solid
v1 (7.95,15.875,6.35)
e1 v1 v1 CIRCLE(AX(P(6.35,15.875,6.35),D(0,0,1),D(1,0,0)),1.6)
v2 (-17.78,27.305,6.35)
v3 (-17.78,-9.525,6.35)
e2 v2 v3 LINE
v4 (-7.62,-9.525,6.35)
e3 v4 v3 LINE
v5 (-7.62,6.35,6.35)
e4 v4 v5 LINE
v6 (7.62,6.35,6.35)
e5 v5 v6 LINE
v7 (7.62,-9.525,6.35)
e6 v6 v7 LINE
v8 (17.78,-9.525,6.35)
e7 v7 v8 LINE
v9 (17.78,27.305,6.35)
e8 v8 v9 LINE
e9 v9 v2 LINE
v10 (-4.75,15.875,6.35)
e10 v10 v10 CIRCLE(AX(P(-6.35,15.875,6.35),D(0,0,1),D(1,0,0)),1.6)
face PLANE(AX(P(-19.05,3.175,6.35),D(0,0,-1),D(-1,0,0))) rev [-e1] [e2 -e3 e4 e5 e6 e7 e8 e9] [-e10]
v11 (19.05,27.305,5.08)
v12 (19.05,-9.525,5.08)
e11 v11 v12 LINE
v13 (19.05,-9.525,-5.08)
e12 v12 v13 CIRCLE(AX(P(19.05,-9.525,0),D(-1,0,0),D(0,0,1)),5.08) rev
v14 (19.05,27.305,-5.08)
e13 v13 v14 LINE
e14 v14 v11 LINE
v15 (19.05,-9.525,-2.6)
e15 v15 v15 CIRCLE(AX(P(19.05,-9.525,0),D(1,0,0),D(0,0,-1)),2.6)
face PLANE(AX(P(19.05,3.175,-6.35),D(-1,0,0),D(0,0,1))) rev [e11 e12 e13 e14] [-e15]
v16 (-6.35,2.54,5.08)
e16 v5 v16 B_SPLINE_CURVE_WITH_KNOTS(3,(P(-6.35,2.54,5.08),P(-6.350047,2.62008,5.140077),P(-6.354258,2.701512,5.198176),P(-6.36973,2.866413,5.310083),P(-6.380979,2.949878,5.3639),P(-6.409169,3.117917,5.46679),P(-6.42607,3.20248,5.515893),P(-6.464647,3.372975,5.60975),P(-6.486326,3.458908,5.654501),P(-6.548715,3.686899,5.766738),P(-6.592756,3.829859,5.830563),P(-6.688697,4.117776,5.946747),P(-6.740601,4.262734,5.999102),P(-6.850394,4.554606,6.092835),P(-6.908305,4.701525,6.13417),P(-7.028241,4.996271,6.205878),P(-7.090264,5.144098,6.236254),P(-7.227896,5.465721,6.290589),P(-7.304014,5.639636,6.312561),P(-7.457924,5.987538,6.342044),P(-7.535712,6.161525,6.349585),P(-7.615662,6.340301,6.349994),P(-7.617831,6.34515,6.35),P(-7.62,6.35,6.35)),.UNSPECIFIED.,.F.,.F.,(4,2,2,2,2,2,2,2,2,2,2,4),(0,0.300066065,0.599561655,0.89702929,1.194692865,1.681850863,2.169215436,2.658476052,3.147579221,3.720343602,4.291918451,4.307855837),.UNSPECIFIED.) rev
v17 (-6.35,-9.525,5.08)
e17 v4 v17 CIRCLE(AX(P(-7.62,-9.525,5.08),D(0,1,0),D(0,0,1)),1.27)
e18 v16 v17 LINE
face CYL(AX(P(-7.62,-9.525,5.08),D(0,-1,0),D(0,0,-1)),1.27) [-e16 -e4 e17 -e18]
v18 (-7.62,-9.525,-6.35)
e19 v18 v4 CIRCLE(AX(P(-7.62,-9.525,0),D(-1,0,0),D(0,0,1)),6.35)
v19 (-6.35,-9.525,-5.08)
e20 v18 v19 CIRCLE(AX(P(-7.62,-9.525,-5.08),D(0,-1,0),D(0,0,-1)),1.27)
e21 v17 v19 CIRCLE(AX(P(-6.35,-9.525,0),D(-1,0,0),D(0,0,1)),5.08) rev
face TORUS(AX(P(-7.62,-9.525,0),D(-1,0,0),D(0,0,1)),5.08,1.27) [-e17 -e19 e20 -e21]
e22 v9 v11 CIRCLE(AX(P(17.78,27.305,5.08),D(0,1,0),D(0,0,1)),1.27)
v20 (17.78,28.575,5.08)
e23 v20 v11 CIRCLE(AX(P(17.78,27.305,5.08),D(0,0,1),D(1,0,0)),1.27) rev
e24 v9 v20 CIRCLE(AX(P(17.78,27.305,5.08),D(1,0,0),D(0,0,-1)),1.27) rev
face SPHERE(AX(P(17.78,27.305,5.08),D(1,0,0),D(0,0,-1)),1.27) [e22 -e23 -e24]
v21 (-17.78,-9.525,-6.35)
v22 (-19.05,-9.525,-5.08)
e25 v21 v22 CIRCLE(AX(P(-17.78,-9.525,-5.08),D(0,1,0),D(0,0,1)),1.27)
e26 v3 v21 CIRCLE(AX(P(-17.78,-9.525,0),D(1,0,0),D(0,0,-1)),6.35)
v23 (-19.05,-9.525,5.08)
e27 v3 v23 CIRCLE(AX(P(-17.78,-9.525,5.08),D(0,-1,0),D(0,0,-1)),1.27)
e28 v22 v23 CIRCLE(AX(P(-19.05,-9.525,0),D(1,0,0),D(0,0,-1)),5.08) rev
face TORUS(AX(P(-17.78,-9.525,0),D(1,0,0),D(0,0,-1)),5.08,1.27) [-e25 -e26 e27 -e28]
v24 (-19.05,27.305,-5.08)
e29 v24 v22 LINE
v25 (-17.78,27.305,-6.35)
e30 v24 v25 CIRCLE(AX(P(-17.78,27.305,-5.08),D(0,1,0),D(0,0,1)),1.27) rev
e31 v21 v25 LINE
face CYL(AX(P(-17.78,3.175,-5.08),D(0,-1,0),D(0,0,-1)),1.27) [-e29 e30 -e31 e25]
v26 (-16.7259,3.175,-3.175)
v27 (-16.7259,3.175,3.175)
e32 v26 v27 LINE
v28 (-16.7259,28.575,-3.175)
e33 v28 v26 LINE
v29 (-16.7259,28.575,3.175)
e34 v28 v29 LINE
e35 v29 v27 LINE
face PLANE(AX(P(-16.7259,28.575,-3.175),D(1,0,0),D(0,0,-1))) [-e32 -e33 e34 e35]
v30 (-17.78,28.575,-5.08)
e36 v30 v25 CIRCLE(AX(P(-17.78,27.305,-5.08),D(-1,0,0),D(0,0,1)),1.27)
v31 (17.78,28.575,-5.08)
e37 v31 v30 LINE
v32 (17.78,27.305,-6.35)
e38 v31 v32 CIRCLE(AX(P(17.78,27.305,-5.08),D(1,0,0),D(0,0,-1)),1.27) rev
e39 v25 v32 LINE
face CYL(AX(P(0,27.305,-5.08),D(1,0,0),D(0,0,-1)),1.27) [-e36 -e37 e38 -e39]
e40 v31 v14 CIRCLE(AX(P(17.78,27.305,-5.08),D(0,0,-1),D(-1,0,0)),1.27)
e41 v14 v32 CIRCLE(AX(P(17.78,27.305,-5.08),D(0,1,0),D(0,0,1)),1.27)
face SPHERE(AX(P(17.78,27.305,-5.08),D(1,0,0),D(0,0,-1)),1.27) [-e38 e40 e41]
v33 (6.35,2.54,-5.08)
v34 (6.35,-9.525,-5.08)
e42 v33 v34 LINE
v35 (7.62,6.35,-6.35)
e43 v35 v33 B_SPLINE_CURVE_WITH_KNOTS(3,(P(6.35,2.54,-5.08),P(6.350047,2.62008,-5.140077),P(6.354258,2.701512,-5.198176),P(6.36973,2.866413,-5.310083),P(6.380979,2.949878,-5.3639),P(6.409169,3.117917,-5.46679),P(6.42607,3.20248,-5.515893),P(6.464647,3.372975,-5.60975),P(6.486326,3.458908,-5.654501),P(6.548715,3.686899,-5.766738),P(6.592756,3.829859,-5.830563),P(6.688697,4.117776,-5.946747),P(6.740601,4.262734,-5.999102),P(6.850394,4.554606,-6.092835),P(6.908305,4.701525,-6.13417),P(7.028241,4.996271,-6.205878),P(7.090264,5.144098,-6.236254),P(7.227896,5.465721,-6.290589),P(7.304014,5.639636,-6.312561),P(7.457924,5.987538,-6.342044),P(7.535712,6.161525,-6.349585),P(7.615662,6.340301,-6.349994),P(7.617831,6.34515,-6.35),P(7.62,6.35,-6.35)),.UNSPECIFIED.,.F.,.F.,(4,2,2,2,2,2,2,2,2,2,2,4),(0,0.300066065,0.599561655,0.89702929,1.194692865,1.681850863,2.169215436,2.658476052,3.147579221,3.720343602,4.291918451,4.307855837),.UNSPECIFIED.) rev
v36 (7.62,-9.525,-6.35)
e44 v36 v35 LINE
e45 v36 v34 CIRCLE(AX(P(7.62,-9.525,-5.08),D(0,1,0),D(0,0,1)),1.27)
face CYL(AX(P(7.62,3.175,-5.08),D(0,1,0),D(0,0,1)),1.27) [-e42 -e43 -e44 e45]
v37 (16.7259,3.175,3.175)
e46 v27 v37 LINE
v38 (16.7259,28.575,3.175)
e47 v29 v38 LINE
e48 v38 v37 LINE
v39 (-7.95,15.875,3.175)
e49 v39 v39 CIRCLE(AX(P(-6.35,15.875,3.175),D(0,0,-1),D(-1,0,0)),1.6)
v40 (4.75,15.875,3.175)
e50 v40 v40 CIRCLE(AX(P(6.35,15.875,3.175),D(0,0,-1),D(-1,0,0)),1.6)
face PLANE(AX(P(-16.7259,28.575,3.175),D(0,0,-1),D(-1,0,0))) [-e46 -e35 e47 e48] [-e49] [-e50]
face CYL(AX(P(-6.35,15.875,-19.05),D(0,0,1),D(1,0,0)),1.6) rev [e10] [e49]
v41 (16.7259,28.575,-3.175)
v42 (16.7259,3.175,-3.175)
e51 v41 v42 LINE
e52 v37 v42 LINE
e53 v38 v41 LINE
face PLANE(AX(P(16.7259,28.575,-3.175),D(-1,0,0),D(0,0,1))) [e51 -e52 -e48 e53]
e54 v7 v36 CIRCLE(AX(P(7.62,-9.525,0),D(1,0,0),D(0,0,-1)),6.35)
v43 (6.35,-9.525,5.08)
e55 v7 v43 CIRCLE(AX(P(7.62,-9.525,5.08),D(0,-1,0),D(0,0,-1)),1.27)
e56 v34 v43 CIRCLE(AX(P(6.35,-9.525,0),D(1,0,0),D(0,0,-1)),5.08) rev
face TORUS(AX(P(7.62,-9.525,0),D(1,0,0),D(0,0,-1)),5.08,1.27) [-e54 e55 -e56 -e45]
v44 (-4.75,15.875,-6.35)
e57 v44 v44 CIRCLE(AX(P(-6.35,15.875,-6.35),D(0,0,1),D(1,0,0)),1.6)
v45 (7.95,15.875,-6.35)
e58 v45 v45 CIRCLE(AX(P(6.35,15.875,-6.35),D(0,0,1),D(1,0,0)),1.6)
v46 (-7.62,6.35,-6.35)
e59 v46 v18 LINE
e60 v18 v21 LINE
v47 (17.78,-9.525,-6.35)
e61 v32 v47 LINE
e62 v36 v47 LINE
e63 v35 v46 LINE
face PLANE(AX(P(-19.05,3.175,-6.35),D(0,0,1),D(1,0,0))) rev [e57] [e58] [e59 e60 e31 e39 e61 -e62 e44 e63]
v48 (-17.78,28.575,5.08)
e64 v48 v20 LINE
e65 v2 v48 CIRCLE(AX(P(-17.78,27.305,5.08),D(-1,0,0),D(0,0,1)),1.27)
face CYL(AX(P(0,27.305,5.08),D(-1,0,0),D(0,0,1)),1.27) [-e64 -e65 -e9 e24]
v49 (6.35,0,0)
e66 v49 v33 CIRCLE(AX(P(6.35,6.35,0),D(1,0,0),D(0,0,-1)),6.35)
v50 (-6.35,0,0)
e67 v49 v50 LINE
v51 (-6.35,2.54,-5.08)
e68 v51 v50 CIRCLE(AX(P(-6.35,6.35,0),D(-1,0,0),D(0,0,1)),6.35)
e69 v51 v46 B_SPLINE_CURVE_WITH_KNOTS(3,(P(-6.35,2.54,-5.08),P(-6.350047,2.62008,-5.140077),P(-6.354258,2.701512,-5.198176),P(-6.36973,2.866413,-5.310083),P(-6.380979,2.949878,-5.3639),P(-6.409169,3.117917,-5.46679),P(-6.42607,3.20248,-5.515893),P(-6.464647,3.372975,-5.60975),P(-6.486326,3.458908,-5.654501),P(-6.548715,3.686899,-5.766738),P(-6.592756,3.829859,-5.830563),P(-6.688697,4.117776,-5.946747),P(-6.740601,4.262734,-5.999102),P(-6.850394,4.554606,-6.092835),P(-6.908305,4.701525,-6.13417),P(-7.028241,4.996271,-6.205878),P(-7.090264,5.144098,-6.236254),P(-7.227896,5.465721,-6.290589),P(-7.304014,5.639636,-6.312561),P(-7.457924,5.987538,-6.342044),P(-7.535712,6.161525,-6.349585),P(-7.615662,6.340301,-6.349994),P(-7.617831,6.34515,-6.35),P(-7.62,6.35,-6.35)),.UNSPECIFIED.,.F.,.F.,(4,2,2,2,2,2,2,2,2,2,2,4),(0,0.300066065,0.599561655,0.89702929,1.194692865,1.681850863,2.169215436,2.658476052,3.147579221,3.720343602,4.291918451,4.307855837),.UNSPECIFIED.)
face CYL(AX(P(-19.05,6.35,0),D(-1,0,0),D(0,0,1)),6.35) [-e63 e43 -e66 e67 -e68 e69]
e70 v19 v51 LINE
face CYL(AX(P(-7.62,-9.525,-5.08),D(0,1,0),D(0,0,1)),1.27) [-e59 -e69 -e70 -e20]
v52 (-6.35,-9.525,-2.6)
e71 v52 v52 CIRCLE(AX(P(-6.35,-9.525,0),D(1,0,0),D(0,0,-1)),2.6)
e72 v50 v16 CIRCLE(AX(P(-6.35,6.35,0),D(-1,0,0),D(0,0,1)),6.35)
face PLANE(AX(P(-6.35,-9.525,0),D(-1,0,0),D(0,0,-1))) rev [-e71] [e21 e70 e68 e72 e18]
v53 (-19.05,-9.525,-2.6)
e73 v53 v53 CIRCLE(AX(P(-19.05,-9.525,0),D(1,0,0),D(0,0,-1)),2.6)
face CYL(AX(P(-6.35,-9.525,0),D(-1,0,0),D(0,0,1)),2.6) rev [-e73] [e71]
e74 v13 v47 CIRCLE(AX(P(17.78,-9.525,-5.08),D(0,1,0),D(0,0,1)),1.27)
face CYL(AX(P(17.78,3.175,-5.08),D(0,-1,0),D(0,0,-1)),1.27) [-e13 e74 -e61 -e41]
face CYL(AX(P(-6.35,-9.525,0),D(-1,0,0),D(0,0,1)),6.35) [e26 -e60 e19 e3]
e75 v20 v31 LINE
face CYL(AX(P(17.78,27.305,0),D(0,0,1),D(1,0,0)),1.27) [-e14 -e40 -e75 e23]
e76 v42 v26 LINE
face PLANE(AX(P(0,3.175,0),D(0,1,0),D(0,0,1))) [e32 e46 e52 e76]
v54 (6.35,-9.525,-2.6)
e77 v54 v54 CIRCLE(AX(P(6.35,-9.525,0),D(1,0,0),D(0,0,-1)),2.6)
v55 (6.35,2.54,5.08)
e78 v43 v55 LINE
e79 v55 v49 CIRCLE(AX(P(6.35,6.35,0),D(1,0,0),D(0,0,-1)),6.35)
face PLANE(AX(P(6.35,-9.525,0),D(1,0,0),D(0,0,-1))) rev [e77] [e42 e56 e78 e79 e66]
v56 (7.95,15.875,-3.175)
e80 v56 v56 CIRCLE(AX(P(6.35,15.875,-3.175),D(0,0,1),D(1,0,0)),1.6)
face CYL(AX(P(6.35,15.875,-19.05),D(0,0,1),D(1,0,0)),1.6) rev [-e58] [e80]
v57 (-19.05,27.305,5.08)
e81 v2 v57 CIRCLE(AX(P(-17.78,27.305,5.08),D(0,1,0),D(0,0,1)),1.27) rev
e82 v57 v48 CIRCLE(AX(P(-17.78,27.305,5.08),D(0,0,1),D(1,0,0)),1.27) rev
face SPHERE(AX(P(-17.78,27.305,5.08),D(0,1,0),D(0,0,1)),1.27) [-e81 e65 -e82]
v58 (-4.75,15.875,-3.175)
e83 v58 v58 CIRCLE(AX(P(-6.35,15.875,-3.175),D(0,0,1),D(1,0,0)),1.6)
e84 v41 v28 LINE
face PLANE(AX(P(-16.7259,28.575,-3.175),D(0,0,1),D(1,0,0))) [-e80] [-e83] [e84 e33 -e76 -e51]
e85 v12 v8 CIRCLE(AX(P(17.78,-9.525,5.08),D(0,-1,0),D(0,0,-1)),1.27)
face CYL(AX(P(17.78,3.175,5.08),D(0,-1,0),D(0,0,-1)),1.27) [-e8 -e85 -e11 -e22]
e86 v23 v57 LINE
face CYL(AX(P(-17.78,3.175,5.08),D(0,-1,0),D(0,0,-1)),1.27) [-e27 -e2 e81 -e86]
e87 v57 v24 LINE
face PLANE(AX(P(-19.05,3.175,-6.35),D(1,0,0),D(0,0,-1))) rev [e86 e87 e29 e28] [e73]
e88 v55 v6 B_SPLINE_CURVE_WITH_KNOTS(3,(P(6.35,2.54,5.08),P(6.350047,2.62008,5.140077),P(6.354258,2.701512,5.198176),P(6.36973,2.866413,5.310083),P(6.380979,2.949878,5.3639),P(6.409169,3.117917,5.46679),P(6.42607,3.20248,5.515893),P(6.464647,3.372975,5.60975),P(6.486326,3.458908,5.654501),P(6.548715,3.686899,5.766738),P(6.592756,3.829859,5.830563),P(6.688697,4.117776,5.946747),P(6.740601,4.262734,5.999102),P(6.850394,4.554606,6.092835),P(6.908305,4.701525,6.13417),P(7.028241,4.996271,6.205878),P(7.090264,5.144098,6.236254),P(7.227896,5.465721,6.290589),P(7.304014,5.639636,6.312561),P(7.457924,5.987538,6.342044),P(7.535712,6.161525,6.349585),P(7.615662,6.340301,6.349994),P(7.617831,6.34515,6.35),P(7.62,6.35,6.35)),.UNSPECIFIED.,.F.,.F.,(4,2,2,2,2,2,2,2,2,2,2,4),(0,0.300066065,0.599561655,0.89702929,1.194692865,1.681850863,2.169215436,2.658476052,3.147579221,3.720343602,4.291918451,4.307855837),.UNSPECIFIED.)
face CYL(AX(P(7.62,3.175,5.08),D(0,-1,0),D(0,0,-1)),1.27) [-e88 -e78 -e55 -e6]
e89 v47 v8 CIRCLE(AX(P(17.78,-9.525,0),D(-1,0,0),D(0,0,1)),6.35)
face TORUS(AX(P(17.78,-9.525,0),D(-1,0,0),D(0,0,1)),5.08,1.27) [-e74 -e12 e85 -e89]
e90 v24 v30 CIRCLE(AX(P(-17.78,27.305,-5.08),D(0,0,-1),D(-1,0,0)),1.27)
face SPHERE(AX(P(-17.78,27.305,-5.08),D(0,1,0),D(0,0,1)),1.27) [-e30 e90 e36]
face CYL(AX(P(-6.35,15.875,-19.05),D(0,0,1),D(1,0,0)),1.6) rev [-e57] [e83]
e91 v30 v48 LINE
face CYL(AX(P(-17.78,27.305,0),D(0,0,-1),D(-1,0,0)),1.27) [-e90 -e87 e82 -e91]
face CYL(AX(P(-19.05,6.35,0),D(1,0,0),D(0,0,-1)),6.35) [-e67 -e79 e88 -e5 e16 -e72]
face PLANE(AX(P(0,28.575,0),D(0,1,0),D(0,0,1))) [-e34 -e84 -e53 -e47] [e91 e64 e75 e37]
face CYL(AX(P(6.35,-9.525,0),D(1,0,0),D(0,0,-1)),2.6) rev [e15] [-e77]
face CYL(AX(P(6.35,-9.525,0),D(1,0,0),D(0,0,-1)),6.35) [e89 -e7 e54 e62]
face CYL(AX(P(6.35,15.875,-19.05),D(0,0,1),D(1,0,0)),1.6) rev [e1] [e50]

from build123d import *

# Parameters (mm, degrees)
ESQUISSE1_W             = 38.1
ESQUISSE1_H             = 12.7
BOSS_EXTRU_1_DEPTH      = 3.175
ESQUISSE2_W             = 38.1
ESQUISSE2_H             = 12.7
ESQUISSE2_W_2           = 33.4518
ESQUISSE2_H_2           = 6.35
BOSS_EXTRU_2_DEPTH      = 25.4
ESQUISSE3_R             = 1.6
ENL_V_MAT_EXTRU_1_DEPTH = 25.4
ESQUISSE4_R             = 2.6
BOSS_EXTRU_3_DEPTH      = 12.7
CONG_1_R                = 6.35
CONG_2_R                = 1.27


with BuildPart() as part:
    # Esquisse1 → Boss.-Extru.1 (new body)
    with BuildSketch(Plane(origin=(0, 0, 0), x_dir=(1, 0, 0), z_dir=(0, 1, 0))):
        Rectangle(ESQUISSE1_W, ESQUISSE1_H)
    extrude(amount=BOSS_EXTRU_1_DEPTH)

    # Esquisse2 → Boss.-Extru.2 (add)
    with BuildSketch(Plane(origin=(0, 3.175, 0), x_dir=(1, 0, 0), z_dir=(0, 1, 0))):
        Rectangle(ESQUISSE2_W, ESQUISSE2_H)
        Rectangle(ESQUISSE2_W_2, ESQUISSE2_H_2, mode=Mode.SUBTRACT)
    extrude(amount=BOSS_EXTRU_2_DEPTH)

    # Esquisse3 → Enlèv. mat.-Extru.1 (cut)
    with BuildSketch(Plane.XY.offset(6.35)):
        with Locations((-6.35, 15.875)):
            Circle(ESQUISSE3_R)
        with Locations((6.35, 15.875)):
            Circle(ESQUISSE3_R)
    extrude(amount=-ENL_V_MAT_EXTRU_1_DEPTH, mode=Mode.SUBTRACT)

    # Esquisse4 → Boss.-Extru.3 (add)
    with BuildSketch(Plane(origin=(19.05, 0, 0), x_dir=(0, 0, -1), z_dir=(1, 0, 0))):
        with BuildLine():
            Line((-6.35, 0), (-6.35, -9.525))
            ThreePointArc((-6.35, -9.525), (0, -15.875), (6.35, -9.525))
            Line((6.35, -9.525), (6.35, 0))
            Line((6.35, 0), (-6.35, 0))
        make_face()
        with Locations((0, -9.525)):
            Circle(ESQUISSE4_R, mode=Mode.SUBTRACT)
    boss_extru_3 = extrude(amount=-BOSS_EXTRU_3_DEPTH)

    # Symétrie1: Boss.-Extru.3 across plane
    add(boss_extru_3.mirror(Plane(origin=(0, 0, 0), x_dir=(0, 0, 1), z_dir=(1, 0, 0))))

    # Congé1
    cong_1_edges = [part.edges().sort_by_distance(p)[0] for p in [
        (0, 0, -6.35),
        (0, 0, 6.35),
    ]]
    fillet(cong_1_edges, radius=CONG_1_R - 0.0001)  # a hair under: the kernel refuses the full size

    # Congé2
    cong_2_edges = [part.edges().sort_by_distance(p)[0] for p in [
        (-19.05, 28.575, 0),
        (0, 28.575, 6.35),
        (19.05, 28.575, 0),
        (0, 28.575, -6.35),
        (6.35, -1.58755, -6.35),
        (6.35, -15.875, 0),
        (6.35, -1.58755, 6.35),
        (19.05, -15.875, 0),
        (-6.35, -1.58755, 6.35),
        (-6.35, -15.875, 0),
        (-6.35, -1.58755, -6.35),
        (-19.05, -15.875, 0),
        (19.05, 9.525, 6.35),
        (-19.05, 9.525, 6.35),
        (-19.05, 9.525, -6.35),
        (19.05, 9.525, -6.35),
    ]]
    fillet(cong_2_edges, radius=CONG_2_R)


solid = part.part
